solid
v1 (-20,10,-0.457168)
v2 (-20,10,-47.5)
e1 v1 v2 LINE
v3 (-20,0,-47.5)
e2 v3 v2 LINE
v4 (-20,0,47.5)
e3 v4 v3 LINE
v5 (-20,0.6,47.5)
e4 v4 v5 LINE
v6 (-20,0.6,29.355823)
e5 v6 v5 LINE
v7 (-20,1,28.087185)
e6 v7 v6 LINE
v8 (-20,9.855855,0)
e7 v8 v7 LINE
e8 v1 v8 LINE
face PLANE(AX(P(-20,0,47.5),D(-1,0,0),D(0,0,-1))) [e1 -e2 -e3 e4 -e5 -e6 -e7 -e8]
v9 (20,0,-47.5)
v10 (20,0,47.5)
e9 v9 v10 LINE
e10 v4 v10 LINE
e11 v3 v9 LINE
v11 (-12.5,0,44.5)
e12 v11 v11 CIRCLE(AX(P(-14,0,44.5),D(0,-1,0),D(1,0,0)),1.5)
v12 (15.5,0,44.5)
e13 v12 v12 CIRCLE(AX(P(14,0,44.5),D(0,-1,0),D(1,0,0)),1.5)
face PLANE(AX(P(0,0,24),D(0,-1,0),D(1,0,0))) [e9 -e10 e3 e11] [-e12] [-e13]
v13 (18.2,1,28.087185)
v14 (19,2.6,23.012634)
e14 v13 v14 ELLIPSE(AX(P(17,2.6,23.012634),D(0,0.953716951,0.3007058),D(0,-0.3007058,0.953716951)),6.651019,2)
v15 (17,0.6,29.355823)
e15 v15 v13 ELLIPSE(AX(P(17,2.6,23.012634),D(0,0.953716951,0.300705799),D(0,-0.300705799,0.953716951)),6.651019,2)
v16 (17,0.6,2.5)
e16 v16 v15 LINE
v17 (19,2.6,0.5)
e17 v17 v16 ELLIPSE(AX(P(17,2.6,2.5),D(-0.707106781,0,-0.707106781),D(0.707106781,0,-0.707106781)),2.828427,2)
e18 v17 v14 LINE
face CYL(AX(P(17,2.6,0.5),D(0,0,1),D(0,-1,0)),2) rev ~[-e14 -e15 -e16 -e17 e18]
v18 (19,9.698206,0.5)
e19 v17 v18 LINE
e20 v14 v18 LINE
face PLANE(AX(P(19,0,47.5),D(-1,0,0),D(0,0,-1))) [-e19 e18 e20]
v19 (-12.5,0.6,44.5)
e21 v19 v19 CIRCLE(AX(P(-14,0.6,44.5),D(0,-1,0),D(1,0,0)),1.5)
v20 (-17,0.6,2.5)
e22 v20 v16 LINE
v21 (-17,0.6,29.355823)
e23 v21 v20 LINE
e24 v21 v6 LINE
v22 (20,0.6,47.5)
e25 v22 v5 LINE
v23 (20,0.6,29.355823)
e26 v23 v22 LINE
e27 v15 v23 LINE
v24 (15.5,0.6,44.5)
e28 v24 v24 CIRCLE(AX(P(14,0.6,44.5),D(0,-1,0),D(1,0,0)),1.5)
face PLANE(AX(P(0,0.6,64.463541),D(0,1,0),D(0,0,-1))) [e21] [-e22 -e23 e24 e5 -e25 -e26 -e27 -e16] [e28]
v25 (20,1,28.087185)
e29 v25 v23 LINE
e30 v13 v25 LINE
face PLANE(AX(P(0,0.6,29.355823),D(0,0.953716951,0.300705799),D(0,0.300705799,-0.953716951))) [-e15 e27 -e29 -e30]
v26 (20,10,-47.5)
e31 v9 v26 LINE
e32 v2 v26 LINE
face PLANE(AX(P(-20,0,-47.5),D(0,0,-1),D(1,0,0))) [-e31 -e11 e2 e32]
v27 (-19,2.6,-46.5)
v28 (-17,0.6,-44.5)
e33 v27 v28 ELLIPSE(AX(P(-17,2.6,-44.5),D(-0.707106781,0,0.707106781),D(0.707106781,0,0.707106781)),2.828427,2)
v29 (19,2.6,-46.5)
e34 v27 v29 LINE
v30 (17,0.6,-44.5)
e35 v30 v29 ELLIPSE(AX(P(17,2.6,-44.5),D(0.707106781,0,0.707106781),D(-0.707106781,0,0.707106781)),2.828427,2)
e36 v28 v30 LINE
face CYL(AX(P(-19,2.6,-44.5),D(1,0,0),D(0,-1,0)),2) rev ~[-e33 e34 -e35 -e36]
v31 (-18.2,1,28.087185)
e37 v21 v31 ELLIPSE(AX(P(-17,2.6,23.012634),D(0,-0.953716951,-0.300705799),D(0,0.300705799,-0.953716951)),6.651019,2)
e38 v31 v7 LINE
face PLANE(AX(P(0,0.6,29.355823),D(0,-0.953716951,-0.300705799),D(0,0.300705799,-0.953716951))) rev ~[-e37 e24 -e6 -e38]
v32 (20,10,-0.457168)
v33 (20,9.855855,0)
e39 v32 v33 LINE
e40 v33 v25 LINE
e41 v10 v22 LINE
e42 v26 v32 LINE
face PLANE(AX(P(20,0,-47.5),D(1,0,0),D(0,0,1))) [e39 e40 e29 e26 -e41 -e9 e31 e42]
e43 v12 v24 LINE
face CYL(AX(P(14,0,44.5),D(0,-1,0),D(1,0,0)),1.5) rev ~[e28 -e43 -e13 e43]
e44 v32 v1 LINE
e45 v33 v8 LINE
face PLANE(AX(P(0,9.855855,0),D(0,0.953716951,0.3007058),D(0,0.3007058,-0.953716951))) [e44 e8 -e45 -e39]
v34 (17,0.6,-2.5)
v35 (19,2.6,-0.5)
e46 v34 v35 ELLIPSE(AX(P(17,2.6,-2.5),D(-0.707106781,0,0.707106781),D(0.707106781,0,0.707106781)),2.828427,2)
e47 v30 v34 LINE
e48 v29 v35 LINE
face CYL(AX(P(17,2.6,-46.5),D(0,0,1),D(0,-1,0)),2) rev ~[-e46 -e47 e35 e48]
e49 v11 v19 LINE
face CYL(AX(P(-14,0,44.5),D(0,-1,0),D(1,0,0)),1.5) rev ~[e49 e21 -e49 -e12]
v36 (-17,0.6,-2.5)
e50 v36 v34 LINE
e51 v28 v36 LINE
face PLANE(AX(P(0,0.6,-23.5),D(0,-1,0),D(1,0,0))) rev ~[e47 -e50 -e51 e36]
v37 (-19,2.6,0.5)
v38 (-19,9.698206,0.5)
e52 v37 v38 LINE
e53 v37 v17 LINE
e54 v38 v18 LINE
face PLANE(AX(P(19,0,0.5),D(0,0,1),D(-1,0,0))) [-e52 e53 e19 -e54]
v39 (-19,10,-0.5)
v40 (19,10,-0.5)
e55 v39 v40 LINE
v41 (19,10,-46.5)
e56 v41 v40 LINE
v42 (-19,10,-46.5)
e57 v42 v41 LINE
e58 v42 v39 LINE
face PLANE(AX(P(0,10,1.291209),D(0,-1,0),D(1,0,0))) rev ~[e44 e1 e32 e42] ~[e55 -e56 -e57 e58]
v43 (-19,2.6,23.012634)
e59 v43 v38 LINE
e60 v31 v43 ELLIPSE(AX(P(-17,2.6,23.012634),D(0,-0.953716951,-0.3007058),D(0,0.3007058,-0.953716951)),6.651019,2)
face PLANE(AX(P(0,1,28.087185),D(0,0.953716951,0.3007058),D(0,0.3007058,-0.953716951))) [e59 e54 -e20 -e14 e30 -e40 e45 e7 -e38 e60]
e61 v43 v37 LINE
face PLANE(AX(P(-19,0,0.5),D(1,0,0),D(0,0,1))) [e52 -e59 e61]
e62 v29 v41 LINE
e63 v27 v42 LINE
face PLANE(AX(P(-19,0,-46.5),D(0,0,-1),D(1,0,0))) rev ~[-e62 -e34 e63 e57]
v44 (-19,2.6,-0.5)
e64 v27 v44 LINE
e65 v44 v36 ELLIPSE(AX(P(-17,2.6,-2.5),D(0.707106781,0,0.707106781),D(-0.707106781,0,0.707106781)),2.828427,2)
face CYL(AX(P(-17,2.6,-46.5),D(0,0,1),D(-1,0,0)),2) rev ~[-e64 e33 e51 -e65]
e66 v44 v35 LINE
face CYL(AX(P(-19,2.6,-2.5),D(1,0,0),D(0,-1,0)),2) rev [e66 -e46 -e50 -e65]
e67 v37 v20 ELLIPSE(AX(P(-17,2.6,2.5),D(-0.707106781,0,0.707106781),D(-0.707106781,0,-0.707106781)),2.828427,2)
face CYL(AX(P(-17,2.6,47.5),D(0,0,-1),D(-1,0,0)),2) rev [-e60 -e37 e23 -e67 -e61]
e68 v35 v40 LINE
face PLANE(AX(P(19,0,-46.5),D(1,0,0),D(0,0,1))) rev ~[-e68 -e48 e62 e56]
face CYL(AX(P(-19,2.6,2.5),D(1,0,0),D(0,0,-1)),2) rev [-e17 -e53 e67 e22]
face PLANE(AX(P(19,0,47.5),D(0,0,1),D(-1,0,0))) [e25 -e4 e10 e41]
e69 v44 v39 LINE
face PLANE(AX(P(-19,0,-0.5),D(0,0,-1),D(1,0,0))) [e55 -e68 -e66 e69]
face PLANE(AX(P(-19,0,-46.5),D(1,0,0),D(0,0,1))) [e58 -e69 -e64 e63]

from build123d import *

# Parameters (mm, degrees)
F0_W          = 38
F0_H          = 46
F2_DEPTH      = 10
F0_R          = 1.5
F3_DEPTH      = 0.6
F4_R          = 2
F5_DEPTH      = 25
F5_DEPTH_BACK = 25


with BuildPart() as f2:
    # F0 (on Front) → F2 (new body)
    with BuildSketch(Plane.XZ):
        Polygon((19, -47.5), (20, -47.5), (20, 47.5), (19, 47.5), (19, 44.5), (19, 0.5), (-19, 0.5), (-19, 47.5), (-20, 47.5), (-20, -47.5), align=None)
        with Locations((0, -23.5)):
            Rectangle(F0_W, F0_H, mode=Mode.SUBTRACT)
    extrude(amount=-F2_DEPTH)

    # F0 (on Front) → F3 (join)
    with BuildSketch(Plane.XZ):
        Polygon((19, 44.5), (19, 47.5), (-19, 47.5), (-19, 0.5), (19, 0.5), align=None)
        with Locations((-14, 44.5)):
            Circle(F0_R, mode=Mode.SUBTRACT)
        with Locations((14, 44.5)):
            Circle(F0_R, mode=Mode.SUBTRACT)
        with Locations((0, -23.5)):
            Rectangle(F0_W, F0_H)
    extrude(amount=-F3_DEPTH)

    # F4
    f4_edges = [f2.edges().sort_by_distance(p)[0] for p in [
        (-19, 0.6, 24),
        (0, 0.6, 0.5),
        (19, 0.6, 24),
        (-19, 0.6, -23.5),
        (0, 0.6, -0.5),
        (19, 0.6, -23.5),
        (0, 0.6, -46.5),
    ]]
    fillet(f4_edges, radius=F4_R)

    # F1 (on Right) → F5 (cut, two sides)
    with BuildSketch(Plane.YZ) as f5_sk:
        Polygon((10, -0.4571680084), (10, 31.2587800152), (10, 64.4635409117), (1, 64.4635409117), (0.6, 64.4635409117), (0.6, 29.3558231338), (1, 28.0871852128), (9.8558554806, 0), align=None)
    extrude(amount=-F5_DEPTH, mode=Mode.SUBTRACT)
    extrude(f5_sk.sketch, amount=F5_DEPTH_BACK, mode=Mode.SUBTRACT)


solid = f2.part
